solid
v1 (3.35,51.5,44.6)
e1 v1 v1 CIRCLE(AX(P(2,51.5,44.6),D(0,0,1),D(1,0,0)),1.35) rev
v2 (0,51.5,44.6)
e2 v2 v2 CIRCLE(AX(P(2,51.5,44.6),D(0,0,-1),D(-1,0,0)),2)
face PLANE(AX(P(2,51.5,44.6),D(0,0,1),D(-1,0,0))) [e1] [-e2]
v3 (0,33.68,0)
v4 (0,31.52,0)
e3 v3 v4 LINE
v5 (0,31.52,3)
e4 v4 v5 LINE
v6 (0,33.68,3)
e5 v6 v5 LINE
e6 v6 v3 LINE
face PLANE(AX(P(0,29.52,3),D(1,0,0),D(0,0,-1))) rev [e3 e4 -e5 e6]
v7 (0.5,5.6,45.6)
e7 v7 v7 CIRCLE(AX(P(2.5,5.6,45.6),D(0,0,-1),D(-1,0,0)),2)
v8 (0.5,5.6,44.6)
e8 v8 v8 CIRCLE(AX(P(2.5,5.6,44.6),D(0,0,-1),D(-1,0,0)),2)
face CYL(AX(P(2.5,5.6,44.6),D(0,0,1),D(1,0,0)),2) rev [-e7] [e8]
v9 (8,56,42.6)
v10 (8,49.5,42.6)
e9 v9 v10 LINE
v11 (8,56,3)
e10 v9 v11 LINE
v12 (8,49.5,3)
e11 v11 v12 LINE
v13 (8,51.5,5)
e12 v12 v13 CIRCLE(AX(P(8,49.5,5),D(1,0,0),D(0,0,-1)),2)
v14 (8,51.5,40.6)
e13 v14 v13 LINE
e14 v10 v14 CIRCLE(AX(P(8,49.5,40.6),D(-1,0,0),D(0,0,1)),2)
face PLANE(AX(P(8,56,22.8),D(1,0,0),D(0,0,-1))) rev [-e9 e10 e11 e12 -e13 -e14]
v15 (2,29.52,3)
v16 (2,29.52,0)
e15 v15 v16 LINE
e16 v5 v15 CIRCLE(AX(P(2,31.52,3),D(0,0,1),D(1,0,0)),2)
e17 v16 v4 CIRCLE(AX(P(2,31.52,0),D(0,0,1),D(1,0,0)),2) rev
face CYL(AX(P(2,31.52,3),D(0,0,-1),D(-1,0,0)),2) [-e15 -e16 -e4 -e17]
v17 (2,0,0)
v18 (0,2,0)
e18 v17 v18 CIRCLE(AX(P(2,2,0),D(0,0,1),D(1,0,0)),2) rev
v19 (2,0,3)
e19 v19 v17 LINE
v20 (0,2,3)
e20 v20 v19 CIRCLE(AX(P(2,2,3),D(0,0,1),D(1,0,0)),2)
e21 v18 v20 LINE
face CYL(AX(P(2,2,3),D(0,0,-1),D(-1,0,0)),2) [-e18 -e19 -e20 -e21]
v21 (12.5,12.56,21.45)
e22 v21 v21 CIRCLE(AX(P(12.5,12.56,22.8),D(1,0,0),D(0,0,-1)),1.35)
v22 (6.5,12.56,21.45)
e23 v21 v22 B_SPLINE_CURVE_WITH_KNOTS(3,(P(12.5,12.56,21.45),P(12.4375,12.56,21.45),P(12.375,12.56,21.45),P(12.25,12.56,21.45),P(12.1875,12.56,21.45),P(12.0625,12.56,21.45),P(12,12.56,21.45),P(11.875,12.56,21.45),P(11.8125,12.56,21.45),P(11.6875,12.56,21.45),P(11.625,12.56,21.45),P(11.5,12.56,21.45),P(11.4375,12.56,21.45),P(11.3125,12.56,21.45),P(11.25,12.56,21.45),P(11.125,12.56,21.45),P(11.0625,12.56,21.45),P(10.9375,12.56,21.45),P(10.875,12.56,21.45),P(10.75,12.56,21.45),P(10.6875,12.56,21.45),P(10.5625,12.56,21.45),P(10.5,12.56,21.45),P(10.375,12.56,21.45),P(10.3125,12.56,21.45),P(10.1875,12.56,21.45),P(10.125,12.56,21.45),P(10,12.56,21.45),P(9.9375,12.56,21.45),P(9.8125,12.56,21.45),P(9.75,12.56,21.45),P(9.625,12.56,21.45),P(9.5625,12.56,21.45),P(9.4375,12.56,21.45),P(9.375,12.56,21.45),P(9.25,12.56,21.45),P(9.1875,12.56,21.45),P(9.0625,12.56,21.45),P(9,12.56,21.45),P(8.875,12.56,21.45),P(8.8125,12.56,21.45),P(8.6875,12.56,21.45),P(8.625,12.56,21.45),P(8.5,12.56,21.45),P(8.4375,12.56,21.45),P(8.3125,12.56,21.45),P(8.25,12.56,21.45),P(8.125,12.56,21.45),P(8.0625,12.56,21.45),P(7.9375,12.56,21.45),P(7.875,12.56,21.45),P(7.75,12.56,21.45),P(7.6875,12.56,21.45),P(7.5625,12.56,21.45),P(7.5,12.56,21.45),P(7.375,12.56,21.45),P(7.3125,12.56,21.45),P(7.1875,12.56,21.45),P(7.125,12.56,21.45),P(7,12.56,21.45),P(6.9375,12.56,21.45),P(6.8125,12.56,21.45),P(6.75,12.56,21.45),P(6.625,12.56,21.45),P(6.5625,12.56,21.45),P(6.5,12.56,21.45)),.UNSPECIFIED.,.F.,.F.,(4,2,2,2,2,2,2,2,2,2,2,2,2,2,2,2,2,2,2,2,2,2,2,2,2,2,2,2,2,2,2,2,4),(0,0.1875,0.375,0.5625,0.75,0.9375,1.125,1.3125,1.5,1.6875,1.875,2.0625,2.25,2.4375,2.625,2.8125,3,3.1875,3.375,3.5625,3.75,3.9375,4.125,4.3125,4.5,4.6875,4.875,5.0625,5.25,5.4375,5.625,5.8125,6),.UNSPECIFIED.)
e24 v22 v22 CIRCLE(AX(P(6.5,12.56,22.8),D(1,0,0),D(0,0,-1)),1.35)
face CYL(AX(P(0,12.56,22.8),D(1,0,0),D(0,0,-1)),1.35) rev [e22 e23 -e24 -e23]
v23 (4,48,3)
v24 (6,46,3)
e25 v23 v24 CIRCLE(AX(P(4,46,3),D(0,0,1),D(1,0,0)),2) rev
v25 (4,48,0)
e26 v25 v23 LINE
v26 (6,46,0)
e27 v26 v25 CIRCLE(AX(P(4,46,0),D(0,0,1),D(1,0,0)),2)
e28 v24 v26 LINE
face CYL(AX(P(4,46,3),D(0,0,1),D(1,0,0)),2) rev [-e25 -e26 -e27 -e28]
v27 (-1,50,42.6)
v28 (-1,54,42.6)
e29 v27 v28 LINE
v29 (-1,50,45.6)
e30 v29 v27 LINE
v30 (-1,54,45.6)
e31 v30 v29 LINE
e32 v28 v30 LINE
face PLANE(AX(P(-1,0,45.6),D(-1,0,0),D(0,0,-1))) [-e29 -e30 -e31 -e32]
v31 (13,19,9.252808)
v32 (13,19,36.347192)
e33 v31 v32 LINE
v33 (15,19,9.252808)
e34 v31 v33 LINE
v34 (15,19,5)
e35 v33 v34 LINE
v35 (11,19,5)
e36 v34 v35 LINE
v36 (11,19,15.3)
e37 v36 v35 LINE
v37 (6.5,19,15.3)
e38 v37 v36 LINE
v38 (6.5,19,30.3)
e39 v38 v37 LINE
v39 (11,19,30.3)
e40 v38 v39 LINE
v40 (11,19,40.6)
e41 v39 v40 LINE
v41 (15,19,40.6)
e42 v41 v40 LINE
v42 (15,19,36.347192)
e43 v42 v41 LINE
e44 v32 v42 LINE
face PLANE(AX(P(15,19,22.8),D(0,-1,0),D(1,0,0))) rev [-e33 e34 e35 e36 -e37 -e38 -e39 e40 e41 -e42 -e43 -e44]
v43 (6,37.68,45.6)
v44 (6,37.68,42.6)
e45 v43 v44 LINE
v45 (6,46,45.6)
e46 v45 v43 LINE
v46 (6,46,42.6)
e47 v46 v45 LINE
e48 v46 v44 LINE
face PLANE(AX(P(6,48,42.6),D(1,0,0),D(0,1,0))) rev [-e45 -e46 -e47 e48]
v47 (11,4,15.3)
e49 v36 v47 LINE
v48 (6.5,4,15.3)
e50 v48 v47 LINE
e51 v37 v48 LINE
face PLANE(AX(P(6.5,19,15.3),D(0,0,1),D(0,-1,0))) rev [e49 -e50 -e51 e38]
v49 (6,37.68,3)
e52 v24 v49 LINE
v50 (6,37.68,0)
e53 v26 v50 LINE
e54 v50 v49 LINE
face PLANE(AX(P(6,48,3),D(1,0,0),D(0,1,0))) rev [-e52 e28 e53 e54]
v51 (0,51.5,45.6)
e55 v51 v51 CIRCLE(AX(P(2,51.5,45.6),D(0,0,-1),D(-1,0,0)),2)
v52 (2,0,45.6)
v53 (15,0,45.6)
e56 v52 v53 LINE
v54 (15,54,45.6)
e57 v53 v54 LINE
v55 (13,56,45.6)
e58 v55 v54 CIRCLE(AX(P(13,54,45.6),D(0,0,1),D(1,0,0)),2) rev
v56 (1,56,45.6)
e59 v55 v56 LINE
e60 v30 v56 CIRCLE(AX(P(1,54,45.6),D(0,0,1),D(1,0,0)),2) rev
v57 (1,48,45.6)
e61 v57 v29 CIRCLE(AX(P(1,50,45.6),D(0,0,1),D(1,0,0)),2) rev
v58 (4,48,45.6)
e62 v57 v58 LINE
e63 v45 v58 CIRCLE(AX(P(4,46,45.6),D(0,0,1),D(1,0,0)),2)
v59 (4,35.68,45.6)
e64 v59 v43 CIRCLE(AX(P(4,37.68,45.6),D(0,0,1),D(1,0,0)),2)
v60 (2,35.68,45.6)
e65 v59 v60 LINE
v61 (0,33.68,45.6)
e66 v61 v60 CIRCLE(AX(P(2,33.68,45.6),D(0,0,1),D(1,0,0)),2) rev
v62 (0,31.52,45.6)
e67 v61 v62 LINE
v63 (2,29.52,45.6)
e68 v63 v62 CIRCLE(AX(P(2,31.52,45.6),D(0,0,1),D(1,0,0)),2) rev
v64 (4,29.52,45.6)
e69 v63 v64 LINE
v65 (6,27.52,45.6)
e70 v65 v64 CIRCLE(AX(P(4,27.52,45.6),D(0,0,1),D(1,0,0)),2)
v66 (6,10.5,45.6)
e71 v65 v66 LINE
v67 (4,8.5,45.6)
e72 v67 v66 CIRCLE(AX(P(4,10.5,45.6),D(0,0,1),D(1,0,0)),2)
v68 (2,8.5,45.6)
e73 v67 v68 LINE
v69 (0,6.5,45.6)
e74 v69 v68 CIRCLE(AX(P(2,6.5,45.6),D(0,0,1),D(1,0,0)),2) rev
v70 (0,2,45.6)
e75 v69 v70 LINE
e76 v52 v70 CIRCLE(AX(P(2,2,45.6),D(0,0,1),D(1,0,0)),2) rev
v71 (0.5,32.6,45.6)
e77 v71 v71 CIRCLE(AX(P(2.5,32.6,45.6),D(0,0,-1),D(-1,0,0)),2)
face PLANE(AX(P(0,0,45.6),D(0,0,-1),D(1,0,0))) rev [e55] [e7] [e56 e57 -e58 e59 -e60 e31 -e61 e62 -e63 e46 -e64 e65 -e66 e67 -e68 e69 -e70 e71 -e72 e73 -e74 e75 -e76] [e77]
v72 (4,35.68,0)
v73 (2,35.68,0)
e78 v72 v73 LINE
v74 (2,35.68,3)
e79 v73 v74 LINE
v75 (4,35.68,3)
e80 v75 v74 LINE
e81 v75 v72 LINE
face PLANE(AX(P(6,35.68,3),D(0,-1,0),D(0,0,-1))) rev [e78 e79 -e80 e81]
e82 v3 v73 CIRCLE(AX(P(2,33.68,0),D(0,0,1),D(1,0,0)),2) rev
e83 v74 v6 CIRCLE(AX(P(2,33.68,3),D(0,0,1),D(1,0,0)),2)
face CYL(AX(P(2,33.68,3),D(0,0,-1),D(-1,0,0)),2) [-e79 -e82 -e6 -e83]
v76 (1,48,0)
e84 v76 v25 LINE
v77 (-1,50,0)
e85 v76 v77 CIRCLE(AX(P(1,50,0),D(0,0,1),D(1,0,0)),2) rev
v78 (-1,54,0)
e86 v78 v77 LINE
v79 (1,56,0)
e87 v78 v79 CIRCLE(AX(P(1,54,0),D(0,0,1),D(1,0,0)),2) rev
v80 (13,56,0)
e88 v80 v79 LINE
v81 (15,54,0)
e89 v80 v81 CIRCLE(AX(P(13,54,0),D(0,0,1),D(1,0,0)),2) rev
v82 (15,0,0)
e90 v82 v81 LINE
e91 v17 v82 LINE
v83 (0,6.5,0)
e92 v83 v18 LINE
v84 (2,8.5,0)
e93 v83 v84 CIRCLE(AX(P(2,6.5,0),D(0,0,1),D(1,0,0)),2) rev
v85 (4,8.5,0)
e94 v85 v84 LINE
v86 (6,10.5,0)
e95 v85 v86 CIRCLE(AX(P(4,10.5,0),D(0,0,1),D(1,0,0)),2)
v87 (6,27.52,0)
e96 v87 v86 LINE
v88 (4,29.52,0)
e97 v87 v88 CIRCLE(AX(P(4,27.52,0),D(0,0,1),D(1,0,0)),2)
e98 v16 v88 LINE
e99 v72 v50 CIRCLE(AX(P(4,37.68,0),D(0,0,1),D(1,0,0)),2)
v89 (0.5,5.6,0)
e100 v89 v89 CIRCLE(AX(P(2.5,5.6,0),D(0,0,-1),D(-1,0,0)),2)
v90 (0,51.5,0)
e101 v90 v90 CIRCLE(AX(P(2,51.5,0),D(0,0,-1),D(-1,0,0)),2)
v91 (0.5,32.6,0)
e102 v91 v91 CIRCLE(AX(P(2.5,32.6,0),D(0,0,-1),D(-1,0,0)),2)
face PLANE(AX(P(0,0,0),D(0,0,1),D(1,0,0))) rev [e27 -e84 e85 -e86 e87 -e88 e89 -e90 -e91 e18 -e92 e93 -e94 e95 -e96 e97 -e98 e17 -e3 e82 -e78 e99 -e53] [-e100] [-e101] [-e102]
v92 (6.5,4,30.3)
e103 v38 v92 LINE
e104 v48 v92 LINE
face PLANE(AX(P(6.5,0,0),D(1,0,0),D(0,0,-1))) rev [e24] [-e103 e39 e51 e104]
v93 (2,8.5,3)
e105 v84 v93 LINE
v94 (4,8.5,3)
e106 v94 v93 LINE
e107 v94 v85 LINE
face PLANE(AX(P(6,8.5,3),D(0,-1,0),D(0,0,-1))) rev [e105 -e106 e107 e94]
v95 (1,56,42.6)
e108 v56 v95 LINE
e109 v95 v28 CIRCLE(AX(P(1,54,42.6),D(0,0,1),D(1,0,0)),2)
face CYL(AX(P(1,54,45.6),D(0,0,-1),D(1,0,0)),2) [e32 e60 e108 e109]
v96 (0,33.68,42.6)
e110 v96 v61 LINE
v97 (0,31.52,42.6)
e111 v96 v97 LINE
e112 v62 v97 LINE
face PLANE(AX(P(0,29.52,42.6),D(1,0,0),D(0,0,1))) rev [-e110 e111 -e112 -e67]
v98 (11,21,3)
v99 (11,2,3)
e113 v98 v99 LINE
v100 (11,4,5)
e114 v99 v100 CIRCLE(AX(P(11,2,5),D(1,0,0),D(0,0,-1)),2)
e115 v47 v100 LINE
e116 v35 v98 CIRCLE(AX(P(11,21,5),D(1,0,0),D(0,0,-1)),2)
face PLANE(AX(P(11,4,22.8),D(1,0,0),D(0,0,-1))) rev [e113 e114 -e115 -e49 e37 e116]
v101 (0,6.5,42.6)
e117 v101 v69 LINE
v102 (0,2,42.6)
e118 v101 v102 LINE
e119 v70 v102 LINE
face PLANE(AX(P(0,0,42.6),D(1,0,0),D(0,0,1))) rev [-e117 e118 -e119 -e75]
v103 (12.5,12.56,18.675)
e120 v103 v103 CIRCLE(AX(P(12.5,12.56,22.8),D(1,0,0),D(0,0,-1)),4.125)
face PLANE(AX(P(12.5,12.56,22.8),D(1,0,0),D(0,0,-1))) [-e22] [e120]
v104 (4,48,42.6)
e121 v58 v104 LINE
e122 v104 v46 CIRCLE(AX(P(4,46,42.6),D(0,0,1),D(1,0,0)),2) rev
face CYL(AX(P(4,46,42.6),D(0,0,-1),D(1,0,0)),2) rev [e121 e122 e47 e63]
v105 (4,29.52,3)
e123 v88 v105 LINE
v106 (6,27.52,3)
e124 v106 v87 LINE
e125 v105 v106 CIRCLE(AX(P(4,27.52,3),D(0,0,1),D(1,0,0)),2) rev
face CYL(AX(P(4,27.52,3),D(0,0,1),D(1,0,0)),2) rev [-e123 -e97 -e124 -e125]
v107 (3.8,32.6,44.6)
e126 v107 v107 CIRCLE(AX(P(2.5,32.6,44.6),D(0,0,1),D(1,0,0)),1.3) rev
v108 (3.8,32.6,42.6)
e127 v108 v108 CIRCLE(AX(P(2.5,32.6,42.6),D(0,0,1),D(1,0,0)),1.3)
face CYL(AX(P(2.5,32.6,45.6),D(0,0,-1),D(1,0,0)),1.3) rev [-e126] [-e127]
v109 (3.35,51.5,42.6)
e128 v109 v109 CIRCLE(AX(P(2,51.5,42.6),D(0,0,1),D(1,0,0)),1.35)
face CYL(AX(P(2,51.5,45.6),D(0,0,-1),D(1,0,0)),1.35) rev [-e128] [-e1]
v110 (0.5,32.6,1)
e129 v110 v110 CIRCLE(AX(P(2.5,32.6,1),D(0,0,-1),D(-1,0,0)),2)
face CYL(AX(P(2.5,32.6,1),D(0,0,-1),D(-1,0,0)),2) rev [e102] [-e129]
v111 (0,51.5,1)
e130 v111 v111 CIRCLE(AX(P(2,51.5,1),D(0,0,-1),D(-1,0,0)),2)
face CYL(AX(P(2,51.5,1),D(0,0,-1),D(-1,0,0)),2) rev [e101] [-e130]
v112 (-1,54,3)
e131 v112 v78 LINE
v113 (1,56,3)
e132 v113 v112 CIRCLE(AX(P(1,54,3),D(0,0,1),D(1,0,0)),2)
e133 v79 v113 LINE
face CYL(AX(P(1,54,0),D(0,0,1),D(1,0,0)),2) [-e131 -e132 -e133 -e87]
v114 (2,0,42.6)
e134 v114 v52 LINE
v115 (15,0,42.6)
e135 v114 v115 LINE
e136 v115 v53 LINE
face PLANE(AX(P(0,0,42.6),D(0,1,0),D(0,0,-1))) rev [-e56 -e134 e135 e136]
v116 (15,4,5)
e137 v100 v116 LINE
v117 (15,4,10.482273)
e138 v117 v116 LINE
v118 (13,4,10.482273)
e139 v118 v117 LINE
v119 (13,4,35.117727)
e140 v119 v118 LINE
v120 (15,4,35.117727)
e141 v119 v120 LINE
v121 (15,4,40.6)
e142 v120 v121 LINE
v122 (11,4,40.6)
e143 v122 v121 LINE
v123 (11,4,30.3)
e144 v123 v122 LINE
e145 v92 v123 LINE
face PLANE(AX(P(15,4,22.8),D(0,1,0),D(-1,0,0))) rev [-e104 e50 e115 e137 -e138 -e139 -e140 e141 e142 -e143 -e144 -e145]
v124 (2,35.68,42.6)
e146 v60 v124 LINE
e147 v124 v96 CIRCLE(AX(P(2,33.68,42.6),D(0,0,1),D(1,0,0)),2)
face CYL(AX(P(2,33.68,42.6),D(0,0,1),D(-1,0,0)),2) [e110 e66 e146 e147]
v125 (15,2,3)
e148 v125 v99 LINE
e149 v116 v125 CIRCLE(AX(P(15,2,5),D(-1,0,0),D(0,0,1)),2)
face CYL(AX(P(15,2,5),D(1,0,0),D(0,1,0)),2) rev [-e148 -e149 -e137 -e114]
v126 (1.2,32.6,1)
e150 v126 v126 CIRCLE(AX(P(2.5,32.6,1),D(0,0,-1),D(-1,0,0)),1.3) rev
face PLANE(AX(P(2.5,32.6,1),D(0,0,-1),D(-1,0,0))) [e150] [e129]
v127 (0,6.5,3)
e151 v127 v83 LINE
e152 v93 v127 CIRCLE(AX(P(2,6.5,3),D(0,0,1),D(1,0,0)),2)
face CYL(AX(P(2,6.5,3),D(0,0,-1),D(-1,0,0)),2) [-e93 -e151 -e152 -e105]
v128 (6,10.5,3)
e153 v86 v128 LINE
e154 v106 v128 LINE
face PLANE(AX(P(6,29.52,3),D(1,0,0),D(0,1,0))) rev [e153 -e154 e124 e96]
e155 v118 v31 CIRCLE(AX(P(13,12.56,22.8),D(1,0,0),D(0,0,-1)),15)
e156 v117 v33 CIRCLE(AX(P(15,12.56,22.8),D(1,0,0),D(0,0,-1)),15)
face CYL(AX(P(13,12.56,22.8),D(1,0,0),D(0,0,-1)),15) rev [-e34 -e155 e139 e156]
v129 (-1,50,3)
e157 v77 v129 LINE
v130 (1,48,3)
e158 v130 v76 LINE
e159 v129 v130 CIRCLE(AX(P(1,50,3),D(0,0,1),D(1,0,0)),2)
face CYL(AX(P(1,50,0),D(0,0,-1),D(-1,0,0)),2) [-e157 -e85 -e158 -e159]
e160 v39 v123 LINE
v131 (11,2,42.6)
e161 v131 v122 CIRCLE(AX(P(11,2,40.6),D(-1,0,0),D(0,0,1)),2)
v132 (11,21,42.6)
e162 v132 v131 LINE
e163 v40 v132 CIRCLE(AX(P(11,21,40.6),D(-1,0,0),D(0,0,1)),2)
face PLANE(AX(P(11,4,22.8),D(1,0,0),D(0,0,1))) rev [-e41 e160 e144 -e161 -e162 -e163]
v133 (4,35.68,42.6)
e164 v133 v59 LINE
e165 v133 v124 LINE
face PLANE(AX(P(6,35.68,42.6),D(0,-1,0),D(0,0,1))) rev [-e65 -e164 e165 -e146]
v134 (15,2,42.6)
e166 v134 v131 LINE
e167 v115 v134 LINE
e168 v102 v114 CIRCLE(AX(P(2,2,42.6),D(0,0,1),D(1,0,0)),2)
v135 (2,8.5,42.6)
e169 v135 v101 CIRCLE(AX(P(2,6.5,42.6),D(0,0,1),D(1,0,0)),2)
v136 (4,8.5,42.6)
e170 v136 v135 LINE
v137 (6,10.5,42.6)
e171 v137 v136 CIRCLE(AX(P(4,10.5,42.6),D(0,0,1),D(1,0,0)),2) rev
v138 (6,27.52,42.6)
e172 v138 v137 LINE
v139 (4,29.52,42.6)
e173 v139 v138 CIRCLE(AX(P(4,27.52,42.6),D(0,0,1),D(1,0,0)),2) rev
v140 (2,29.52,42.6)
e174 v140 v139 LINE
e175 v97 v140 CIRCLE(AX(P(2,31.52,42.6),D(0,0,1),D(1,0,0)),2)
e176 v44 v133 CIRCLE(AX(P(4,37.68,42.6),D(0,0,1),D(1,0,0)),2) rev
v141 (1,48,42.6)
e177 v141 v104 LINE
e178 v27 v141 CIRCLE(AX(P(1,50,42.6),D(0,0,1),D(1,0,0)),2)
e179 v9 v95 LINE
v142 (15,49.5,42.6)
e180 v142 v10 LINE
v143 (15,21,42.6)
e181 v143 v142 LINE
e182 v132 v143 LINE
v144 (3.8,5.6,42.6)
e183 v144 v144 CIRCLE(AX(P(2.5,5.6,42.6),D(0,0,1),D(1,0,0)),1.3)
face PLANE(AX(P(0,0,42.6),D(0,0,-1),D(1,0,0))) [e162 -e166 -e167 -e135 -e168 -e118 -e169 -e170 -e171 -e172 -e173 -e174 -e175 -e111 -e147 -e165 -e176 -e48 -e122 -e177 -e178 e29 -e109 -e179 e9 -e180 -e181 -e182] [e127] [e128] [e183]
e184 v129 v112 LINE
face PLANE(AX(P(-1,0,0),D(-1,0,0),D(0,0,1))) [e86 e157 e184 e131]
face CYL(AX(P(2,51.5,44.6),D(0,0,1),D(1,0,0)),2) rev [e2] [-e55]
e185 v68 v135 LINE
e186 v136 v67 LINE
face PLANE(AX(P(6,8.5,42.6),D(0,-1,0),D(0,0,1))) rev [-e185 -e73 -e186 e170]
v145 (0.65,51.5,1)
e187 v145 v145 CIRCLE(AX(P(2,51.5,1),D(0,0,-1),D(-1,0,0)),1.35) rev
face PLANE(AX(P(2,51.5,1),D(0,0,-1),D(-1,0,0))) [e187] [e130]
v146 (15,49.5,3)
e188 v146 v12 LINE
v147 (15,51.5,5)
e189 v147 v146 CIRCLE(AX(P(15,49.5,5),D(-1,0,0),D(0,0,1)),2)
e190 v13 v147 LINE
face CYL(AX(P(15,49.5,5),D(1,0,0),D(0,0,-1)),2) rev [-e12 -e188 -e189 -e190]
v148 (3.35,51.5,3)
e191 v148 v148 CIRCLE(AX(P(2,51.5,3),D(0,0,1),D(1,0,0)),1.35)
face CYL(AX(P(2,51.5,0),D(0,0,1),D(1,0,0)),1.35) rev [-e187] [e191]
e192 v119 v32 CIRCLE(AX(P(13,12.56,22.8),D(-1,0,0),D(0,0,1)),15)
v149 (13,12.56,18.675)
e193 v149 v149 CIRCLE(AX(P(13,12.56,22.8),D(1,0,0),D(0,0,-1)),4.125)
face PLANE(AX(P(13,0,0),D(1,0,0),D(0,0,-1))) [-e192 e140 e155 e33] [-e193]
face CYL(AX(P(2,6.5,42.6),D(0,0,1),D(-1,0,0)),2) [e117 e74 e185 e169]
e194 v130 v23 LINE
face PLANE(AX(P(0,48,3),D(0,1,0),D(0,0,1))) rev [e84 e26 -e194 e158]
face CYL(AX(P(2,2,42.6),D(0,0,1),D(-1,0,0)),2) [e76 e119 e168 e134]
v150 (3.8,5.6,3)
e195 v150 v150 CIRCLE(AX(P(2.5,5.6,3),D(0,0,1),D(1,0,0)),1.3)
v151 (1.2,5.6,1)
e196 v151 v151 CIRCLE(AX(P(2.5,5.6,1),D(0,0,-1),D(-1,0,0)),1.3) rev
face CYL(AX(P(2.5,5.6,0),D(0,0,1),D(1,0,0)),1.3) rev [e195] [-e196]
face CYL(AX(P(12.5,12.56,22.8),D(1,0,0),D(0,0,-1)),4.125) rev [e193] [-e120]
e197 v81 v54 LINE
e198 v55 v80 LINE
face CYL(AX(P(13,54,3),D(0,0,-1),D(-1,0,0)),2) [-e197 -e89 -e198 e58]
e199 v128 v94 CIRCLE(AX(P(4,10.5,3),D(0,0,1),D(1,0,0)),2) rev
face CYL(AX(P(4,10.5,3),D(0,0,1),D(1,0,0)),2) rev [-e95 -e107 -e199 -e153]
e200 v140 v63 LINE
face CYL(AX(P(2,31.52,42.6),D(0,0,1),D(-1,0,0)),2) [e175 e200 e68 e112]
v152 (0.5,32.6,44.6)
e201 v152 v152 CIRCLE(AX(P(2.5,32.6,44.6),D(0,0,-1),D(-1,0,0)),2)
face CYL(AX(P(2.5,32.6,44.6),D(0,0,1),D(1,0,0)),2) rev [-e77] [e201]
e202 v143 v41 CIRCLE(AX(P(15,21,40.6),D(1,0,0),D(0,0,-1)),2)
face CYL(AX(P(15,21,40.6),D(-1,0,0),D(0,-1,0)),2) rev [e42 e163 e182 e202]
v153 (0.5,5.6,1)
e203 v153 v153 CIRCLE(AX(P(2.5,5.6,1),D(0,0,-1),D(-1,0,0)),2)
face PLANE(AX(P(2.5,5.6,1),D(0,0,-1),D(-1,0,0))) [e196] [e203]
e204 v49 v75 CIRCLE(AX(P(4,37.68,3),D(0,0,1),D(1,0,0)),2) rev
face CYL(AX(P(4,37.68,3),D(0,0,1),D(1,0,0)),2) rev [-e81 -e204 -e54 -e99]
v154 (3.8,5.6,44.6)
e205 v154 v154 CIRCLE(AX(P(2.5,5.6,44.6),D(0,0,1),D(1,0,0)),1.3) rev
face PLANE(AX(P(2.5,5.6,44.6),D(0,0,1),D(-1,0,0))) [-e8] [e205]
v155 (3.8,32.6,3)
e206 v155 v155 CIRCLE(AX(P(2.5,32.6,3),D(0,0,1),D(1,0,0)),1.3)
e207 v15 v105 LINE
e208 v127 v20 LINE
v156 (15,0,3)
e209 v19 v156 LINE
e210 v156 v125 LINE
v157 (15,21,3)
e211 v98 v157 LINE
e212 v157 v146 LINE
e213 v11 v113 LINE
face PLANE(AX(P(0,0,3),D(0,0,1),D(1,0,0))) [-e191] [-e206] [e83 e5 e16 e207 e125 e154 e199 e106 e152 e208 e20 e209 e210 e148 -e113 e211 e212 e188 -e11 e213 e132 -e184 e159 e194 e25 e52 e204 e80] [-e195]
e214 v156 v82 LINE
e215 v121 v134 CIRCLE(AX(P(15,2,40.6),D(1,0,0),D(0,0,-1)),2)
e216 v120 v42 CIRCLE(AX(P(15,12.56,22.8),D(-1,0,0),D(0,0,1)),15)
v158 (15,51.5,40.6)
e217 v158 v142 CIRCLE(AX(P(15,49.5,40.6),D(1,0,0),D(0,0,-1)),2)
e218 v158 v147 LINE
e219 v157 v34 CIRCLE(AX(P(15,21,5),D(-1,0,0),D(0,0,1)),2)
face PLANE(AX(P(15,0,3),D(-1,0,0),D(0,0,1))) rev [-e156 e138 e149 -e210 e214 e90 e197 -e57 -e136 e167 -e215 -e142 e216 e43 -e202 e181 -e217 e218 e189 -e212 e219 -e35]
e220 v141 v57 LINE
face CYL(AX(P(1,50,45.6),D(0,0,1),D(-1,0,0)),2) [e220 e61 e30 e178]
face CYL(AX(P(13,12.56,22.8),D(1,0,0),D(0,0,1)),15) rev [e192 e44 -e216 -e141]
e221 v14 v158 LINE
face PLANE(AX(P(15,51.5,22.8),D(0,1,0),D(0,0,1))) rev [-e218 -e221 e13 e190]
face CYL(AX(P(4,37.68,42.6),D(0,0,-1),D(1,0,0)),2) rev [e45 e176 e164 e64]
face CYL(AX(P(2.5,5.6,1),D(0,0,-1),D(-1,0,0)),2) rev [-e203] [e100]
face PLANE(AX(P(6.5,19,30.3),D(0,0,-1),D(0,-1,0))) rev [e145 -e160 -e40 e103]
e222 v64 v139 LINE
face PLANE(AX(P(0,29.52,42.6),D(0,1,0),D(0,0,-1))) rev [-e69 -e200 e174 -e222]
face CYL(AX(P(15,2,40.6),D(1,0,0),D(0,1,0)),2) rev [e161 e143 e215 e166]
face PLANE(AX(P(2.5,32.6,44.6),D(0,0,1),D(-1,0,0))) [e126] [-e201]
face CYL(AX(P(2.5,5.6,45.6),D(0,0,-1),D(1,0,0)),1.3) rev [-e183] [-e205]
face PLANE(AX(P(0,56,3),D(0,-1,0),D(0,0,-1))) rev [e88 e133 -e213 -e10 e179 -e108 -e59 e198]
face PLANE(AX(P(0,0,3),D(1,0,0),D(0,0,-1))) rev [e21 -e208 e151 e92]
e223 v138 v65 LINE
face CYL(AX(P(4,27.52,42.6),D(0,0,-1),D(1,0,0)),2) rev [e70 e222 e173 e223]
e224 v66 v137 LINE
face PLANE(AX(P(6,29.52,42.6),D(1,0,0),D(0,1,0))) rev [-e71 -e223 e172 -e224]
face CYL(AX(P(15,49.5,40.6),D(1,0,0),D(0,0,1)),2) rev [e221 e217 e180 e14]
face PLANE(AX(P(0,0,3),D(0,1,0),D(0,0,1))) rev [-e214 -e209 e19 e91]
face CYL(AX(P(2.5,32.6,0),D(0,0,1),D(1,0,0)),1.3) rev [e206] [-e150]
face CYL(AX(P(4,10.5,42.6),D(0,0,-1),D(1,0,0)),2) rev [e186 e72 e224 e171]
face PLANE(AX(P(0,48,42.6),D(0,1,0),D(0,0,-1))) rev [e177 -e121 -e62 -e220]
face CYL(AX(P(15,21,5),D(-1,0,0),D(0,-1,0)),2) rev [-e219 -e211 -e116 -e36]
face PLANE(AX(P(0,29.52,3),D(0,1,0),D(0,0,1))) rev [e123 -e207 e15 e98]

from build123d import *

# Parameters (mm, degrees)
BOSS_EXTRUDE1_DEPTH = 3
SKETCH2_R           = 1.35
SKETCH2_R_2         = 1.3
CUT_EXTRUDE1_DEPTH  = 59.051701095
SKETCH3_W           = 7
SKETCH3_H           = 4.5
BOSS_EXTRUDE2_DEPTH = 19.8
SKETCH4_W           = 4
SKETCH4_H           = 15
BOSS_EXTRUDE3_DEPTH = 19.8
CUT_EXTRUDE2_DEPTH  = 2
SKETCH7_R           = 4.125
CUT_EXTRUDE3_DEPTH  = 0.5
SKETCH9_W           = 7.5
SKETCH9_H           = 15
BOSS_EXTRUDE4_DEPTH = 4.5
SKETCH12_R          = 1.35
CUT_EXTRUDE4_DEPTH  = 62.742125004
SKETCH13_W          = 3
SKETCH13_H          = 8
BOSS_EXTRUDE5_DEPTH = 1
FILLET1_R           = 2
SKETCH14_R          = 2
CUT_EXTRUDE5_DEPTH  = 1


with BuildPart() as part:
    # Sketch1 → Boss-Extrude1 (new body)
    with BuildSketch(Plane.XY):
        Polygon((0, 48), (6, 48), (6, 35.68), (0, 35.68), (0, 29.52), (6, 29.52), (6, 8.5), (0, 8.5), (0, 0), (15, 0), (15, 56), (0, 56), align=None)
    extrude(amount=BOSS_EXTRUDE1_DEPTH)

    # Sketch2 → Cut-Extrude1 (cut, through all)
    with BuildSketch(Plane.XY.offset(3)):
        with Locations((2, 51.5)):
            Circle(SKETCH2_R)
        with Locations((2.5, 5.6)):
            Circle(SKETCH2_R_2)
        with Locations((2.5, 32.6)):
            Circle(SKETCH2_R_2)
    extrude(amount=-CUT_EXTRUDE1_DEPTH, mode=Mode.SUBTRACT)

    # Sketch3 → Boss-Extrude2 (add)
    with BuildSketch(Plane.XY.offset(3)):
        with Locations((11.5, 53.75)):
            Rectangle(SKETCH3_W, SKETCH3_H)
    extrude(amount=BOSS_EXTRUDE2_DEPTH)

    # Sketch4 → Boss-Extrude3 (add)
    with BuildSketch(Plane.XY.offset(3)):
        with Locations((13, 11.5)):
            Rectangle(SKETCH4_W, SKETCH4_H)
    extrude(amount=BOSS_EXTRUDE3_DEPTH)

    # Sketch5 → Cut-Extrude2 (cut)
    with BuildSketch(Plane(origin=(15, 0, 0), x_dir=(0, 0, -1), z_dir=(1, 0, 0))):
        with BuildLine():
            Line((-9.252808409, 19), (-22.8, 19))
            Line((-22.8, 19), (-22.8, 4))
            Line((-22.8, 4), (-22.8, -2.44))
            ThreePointArc((-22.8, -2.44), (-12.193398282, 1.953398282), (-7.8, 12.56))
            ThreePointArc((-7.8, 12.56), (-8.167709102, 15.860918519), (-9.252808409, 19))
        make_face()
    extrude(amount=-CUT_EXTRUDE2_DEPTH, mode=Mode.SUBTRACT)

    # Sketch7 → Cut-Extrude3 (cut)
    with BuildSketch(Plane(origin=(13, 0, 0), x_dir=(0, 0, -1), z_dir=(1, 0, 0))):
        with Locations((-22.8, 12.56)):
            Circle(SKETCH7_R)
    extrude(amount=-CUT_EXTRUDE3_DEPTH, mode=Mode.SUBTRACT)

    # Sketch9 → Boss-Extrude4 (add)
    with BuildSketch(Plane.ZY.offset(-11)):
        with Locations((19.05, 11.5)):
            Rectangle(SKETCH9_W, SKETCH9_H)
    extrude(amount=BOSS_EXTRUDE4_DEPTH)

    # Sketch12 → Cut-Extrude4 (cut, through all)
    with BuildSketch(Plane(origin=(12.5, 0, 0), x_dir=(0, 0, -1), z_dir=(1, 0, 0))):
        with Locations((-22.8, 12.56)):
            Circle(SKETCH12_R)
    extrude(amount=-CUT_EXTRUDE4_DEPTH, mode=Mode.SUBTRACT)

    # Sketch13 → Boss-Extrude5 (add)
    with BuildSketch(Plane.ZY):
        with Locations((1.5, 52)):
            Rectangle(SKETCH13_W, SKETCH13_H)
    extrude(amount=BOSS_EXTRUDE5_DEPTH)

    # Fillet1
    fillet1_edges = [part.edges().sort_by_distance(p)[0] for p in [
        (6, 8.5, 1.5),
        (6, 29.52, 1.5),
        (6, 35.68, 1.5),
        (6, 48, 1.5),
        (11.5, 51.5, 3),
        (13, 4, 3),
        (13, 19, 3),
    ]]
    fillet(fillet1_edges, radius=FILLET1_R)
    fillet1_2_edges = [part.edges().sort_by_distance(p)[0] for p in [
        (0, 8.5, 1.5),
        (0, 29.52, 1.5),
        (0, 35.68, 1.5),
        (15, 56, 11.4),
        (0, 0, 1.5),
        (-1, 56, 1.5),
        (-1, 48, 1.5),
    ]]
    fillet(fillet1_2_edges, radius=FILLET1_R)

    # Mirror1: part across plane


with BuildPart() as part_1:
    add(part.part)
    add(part.part.mirror(Plane.XY.offset(22.8)))

    # Sketch14 → Cut-Extrude5 (cut)
    with BuildSketch(Plane(origin=(0, 0, 0), x_dir=(-1, 0, 0), z_dir=(0, 0, -1))):
        with Locations((-2, 51.5)):
            Circle(SKETCH14_R)
        with Locations((-2.5, 32.6)):
            Circle(SKETCH14_R)
        with Locations((-2.5, 5.6)):
            Circle(SKETCH14_R)
    cut_extrude5 = extrude(amount=-CUT_EXTRUDE5_DEPTH, mode=Mode.SUBTRACT)

    # Mirror2: Cut-Extrude5 across plane
    add(cut_extrude5.mirror(Plane(origin=(0, 0, 22.8), x_dir=(1, 0, 0), z_dir=(0, 0, -1))), mode=Mode.SUBTRACT)


solid = part_1.part
